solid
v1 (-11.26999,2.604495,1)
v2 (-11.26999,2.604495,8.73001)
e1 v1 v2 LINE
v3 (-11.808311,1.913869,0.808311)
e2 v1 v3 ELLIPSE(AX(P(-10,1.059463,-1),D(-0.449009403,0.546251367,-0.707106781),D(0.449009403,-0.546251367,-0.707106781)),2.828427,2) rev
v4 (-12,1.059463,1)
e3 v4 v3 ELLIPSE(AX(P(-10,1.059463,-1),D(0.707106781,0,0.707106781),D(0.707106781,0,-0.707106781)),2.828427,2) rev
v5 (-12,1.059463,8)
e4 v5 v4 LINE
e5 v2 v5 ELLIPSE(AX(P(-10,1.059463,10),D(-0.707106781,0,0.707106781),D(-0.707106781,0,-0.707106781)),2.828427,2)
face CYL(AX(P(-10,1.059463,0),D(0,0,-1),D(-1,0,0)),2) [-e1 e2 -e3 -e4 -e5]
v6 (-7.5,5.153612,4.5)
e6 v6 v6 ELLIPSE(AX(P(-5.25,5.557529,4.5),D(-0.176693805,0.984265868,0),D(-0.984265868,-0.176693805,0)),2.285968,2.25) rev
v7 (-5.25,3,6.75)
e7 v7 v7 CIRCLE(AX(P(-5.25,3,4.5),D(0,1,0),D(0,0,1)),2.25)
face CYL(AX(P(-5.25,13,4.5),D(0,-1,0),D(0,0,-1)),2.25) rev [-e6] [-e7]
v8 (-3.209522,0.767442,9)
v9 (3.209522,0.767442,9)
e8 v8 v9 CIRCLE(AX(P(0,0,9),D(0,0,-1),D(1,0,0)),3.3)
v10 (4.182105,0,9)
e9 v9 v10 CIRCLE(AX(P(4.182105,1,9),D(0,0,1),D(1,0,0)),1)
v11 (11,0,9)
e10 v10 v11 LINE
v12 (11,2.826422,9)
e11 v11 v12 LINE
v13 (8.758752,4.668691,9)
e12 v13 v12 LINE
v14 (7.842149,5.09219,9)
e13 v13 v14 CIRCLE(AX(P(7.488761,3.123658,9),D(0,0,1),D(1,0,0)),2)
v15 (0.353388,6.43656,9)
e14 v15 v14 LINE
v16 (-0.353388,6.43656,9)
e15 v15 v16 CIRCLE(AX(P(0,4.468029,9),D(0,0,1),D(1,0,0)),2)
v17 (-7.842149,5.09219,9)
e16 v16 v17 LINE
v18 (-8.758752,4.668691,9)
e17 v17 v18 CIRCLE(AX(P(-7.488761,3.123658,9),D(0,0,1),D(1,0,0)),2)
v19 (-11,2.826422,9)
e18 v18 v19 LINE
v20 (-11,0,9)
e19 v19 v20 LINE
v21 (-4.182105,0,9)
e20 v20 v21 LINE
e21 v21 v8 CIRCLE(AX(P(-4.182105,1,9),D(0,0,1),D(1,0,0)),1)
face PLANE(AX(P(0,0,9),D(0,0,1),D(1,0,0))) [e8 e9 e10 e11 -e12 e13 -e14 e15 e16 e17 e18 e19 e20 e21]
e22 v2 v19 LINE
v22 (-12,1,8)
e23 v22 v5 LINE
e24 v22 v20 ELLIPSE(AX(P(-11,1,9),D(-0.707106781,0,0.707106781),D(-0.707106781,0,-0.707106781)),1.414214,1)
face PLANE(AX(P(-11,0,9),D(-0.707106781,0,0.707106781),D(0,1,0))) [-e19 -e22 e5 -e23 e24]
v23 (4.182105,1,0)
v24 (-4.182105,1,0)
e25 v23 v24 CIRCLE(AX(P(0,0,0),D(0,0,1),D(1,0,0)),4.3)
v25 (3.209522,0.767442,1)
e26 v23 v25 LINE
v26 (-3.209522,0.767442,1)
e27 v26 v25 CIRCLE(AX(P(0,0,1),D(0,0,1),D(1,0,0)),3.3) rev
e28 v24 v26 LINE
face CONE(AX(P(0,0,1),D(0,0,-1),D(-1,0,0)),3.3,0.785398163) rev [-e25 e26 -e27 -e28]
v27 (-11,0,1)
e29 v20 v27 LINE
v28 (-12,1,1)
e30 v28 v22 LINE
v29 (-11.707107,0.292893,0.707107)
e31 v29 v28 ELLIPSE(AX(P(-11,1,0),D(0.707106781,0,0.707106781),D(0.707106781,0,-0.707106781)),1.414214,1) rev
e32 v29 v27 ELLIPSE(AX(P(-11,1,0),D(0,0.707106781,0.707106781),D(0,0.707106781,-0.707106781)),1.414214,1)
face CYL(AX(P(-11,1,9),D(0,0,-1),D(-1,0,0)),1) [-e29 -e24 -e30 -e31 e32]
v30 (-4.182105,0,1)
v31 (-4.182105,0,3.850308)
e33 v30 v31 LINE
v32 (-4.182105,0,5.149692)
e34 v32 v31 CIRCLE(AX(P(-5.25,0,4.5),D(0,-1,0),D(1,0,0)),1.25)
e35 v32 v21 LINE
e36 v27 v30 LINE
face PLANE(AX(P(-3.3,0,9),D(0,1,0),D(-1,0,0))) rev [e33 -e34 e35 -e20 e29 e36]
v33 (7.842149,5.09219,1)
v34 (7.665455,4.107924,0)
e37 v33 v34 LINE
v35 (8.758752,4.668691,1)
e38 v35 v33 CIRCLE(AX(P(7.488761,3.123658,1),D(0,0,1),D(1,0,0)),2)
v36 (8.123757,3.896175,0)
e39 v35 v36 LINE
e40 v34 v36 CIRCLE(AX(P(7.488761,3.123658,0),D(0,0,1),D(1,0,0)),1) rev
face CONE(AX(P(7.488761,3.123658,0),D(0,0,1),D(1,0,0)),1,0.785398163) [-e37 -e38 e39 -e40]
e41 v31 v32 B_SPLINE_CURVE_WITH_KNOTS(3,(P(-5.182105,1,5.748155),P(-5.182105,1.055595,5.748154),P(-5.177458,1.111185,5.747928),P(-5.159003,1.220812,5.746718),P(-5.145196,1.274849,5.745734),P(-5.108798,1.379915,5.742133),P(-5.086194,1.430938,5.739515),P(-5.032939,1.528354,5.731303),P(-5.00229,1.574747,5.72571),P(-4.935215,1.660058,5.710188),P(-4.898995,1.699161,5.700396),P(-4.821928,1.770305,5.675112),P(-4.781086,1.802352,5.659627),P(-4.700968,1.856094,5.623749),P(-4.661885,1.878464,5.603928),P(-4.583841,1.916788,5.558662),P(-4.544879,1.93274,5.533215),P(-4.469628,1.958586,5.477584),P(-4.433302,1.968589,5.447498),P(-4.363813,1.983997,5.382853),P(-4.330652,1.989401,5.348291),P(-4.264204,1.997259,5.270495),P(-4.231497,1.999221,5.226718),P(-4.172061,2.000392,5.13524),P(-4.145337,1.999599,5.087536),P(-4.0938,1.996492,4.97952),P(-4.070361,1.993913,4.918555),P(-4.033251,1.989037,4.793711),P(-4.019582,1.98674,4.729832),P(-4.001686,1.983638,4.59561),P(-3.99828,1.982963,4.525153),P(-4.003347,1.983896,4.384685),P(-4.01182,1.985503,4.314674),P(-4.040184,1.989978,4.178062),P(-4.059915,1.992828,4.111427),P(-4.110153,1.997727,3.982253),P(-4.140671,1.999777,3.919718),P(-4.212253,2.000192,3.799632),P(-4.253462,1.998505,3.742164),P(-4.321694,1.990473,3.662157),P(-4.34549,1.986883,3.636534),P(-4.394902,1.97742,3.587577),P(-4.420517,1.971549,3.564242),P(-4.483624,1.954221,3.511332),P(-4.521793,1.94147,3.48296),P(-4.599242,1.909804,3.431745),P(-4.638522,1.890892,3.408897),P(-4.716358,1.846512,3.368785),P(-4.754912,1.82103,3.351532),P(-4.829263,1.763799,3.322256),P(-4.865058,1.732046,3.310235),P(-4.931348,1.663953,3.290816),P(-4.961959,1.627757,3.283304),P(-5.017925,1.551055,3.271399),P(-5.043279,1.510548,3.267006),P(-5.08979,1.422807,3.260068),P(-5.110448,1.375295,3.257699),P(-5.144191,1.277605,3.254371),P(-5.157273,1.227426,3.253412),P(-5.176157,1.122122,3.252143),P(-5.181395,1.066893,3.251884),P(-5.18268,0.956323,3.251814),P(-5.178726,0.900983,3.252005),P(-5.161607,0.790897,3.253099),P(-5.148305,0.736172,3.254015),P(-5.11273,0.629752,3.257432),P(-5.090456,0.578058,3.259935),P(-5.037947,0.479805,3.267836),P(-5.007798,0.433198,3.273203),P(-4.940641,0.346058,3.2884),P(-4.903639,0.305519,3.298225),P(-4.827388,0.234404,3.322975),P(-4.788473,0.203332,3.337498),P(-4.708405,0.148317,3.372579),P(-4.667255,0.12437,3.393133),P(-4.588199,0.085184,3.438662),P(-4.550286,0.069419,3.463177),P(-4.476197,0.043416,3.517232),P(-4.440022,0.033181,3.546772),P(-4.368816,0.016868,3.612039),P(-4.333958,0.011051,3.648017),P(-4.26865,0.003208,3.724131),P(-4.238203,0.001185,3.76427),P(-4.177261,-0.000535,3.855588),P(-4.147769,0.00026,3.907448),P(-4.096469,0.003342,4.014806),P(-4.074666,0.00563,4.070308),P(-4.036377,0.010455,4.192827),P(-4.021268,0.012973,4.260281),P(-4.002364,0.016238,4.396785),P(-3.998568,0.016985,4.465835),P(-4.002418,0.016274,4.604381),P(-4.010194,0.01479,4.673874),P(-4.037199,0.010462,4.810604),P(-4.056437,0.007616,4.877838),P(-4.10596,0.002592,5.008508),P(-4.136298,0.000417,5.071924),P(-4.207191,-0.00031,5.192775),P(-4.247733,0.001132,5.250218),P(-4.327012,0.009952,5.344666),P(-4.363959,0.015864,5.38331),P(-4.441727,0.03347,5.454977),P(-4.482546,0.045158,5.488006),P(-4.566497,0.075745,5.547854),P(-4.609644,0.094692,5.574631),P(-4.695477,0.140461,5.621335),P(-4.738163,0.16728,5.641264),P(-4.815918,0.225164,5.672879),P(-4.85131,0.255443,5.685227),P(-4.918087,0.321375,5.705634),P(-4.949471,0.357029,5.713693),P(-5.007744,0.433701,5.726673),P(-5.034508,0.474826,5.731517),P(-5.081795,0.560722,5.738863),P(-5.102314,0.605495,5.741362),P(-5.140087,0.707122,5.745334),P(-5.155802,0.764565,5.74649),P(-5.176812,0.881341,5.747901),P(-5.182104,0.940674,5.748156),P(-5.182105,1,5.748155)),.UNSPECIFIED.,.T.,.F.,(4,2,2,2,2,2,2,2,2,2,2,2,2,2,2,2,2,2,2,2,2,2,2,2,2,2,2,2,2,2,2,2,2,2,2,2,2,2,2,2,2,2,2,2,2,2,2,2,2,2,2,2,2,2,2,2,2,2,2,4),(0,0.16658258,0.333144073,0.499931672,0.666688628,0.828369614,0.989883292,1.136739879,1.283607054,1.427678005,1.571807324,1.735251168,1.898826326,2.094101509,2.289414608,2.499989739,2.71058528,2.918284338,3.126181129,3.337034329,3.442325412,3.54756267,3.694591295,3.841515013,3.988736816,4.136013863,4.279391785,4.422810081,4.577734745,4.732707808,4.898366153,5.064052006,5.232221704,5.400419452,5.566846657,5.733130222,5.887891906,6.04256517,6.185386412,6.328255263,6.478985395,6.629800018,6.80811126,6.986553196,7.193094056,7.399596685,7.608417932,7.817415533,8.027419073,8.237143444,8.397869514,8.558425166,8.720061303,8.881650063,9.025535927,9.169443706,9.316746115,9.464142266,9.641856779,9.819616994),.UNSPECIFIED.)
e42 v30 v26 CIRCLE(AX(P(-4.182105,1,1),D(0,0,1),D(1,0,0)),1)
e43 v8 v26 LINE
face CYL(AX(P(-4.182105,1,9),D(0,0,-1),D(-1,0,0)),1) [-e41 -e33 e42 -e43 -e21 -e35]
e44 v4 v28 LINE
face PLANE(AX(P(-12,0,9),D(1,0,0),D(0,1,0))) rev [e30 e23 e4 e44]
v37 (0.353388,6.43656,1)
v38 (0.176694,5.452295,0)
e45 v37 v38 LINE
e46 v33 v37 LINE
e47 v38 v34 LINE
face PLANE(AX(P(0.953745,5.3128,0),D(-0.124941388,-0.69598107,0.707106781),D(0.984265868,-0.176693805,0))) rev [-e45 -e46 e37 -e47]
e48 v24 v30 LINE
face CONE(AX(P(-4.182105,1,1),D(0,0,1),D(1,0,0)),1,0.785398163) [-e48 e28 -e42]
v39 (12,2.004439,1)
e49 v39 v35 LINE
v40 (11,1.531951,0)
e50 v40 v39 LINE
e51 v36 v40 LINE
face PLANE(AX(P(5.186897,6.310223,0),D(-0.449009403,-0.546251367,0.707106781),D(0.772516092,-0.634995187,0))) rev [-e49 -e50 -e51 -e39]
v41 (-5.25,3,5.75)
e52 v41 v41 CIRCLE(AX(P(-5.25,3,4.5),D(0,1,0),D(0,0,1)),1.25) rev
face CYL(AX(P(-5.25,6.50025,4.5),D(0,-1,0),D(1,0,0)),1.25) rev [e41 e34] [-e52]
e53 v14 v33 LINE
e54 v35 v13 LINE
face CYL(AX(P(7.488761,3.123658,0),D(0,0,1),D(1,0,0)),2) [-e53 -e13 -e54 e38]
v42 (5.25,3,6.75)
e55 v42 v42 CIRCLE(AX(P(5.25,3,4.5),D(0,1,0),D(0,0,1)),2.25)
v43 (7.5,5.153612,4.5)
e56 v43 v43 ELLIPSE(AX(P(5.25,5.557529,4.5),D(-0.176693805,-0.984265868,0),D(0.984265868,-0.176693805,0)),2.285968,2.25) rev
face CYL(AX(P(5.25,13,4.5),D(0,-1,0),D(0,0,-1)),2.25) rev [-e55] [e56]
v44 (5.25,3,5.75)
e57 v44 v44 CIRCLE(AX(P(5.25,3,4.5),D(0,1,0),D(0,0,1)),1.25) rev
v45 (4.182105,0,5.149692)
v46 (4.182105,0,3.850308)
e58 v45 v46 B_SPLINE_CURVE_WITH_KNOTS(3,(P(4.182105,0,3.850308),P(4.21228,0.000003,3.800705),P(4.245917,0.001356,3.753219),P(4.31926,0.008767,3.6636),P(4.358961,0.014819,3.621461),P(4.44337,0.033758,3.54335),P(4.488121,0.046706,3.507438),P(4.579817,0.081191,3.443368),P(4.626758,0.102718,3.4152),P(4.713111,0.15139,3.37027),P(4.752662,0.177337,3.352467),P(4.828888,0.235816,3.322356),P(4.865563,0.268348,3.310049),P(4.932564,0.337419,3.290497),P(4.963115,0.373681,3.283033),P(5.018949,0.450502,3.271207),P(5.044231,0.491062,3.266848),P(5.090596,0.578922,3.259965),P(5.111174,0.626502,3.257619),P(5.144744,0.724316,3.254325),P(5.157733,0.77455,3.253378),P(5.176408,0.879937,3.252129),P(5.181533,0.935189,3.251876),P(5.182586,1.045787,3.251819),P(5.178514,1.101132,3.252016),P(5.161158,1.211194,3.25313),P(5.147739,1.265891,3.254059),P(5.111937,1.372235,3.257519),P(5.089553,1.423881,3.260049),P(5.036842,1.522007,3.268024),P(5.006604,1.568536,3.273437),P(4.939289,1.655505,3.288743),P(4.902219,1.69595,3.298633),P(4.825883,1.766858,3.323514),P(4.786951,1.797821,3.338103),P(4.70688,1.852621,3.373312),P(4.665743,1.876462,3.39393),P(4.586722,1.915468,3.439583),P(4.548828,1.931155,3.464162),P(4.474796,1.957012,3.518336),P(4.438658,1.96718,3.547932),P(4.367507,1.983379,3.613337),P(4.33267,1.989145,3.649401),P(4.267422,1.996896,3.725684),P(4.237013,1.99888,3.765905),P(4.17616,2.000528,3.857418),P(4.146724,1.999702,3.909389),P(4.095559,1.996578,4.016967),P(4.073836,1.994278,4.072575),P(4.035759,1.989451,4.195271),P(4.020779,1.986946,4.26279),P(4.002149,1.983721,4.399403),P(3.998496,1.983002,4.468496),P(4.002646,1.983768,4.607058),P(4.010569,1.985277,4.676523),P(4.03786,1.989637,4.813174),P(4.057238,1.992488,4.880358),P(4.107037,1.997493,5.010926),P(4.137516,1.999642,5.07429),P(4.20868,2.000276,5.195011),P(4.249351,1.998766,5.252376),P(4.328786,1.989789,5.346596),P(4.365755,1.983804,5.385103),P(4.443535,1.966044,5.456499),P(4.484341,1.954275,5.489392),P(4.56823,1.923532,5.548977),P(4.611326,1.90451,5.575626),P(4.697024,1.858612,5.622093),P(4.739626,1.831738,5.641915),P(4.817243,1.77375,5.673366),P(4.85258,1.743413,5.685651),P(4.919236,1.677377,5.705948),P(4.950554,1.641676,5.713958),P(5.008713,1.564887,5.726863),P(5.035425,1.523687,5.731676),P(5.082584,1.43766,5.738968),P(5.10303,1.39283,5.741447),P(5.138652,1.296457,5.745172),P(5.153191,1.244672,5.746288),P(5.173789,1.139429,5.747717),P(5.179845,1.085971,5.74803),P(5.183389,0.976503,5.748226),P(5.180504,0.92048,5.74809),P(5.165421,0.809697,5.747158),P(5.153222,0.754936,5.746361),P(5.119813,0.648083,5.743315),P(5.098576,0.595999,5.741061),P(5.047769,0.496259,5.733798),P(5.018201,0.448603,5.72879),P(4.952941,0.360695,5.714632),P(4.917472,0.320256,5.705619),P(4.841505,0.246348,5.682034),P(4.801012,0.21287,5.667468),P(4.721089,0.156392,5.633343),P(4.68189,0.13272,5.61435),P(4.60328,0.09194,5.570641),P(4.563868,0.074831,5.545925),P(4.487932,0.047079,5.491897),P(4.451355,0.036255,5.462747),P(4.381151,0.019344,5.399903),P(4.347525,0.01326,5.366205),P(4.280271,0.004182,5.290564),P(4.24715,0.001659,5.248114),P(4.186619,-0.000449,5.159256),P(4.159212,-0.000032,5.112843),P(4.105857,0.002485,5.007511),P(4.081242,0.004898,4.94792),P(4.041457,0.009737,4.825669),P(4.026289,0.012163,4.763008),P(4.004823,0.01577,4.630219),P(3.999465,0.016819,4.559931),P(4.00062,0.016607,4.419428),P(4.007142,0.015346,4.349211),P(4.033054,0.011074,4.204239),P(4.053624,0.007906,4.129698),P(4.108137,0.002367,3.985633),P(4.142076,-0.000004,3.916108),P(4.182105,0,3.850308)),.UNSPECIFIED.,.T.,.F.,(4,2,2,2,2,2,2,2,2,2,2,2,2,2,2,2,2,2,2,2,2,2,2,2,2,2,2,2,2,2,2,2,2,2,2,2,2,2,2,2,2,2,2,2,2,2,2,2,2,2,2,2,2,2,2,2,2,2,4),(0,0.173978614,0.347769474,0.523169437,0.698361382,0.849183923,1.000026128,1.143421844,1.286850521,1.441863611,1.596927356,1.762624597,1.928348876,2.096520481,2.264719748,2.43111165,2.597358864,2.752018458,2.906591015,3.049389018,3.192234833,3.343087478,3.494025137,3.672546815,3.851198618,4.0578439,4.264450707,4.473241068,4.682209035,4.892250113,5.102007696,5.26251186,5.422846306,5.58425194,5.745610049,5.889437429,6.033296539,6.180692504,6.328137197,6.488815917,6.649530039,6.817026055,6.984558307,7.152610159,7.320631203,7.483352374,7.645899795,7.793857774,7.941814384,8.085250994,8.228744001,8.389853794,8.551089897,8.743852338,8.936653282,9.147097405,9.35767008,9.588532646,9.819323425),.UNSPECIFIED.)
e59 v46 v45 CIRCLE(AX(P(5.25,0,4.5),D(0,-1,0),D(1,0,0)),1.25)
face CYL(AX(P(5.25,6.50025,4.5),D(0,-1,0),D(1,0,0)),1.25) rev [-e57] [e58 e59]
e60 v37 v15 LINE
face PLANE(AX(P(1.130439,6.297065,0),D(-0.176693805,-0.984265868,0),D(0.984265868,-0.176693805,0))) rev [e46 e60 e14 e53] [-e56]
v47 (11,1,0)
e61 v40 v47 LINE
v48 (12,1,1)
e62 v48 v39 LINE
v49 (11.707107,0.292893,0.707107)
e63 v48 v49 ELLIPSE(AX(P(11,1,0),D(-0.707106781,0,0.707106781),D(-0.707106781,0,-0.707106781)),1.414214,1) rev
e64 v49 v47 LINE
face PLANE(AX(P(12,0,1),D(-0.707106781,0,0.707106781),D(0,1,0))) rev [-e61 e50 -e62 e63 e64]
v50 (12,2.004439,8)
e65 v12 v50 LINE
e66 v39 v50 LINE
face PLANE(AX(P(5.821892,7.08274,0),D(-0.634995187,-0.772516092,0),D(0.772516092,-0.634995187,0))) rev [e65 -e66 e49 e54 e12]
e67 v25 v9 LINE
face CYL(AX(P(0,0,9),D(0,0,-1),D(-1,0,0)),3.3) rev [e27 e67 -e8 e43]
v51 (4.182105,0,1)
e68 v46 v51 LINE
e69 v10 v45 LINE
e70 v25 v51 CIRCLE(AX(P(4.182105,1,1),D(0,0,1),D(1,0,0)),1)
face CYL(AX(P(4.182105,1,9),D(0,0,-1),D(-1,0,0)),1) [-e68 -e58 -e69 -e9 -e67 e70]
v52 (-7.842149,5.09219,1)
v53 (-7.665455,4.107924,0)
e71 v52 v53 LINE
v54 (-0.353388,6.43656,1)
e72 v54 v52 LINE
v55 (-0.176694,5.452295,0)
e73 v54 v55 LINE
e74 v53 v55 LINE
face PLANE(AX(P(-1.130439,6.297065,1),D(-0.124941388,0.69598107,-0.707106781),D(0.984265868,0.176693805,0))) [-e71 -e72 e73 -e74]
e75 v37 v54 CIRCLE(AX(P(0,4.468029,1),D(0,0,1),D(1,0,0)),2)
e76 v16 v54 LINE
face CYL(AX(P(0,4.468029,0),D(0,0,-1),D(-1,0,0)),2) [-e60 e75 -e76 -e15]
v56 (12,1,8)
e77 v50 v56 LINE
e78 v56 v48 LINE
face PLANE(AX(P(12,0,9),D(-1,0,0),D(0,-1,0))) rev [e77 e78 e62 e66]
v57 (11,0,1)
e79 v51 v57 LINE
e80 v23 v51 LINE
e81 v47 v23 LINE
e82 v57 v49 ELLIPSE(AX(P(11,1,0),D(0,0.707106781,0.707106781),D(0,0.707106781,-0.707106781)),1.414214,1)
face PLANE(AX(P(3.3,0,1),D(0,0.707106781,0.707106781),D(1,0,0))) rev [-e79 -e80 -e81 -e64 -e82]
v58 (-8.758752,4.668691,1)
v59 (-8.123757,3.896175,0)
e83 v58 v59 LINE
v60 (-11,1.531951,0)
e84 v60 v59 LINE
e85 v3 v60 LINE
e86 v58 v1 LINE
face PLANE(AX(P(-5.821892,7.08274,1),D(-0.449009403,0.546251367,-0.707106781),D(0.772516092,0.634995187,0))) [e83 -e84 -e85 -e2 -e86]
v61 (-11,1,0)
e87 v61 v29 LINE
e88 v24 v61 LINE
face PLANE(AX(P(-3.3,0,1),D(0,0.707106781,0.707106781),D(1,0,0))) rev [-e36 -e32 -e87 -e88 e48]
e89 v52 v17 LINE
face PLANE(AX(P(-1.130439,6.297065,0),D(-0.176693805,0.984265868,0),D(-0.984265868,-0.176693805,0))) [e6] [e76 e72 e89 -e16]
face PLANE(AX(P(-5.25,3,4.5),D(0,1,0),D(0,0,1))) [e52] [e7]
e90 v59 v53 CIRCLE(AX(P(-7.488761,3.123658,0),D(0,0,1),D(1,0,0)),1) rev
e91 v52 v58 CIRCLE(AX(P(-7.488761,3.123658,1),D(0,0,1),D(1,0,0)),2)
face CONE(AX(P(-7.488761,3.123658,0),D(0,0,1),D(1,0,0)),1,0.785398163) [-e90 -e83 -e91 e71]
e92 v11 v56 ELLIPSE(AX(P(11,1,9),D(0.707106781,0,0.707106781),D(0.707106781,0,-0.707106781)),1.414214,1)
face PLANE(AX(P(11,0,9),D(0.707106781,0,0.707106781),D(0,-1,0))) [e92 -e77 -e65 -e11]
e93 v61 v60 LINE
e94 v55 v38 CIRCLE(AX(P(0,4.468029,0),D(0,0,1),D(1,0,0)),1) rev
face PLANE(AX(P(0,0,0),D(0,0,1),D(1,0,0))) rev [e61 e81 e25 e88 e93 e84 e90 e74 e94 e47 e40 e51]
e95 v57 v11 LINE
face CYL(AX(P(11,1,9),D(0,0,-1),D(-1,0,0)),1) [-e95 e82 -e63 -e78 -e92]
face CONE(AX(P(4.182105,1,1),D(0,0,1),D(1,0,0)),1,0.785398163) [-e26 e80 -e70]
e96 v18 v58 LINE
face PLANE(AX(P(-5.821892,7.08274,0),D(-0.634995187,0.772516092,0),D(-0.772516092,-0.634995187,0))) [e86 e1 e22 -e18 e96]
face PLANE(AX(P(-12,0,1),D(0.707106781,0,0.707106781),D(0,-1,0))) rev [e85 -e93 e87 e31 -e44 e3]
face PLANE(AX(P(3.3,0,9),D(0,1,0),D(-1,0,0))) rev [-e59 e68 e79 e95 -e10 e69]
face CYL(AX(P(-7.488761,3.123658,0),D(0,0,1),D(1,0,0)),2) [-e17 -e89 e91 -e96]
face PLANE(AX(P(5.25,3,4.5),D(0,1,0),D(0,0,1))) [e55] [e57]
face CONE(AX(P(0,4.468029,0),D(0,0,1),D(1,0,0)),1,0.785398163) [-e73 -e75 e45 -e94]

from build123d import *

# Parameters (mm, degrees)
BOSS_EXTRUDE1_DEPTH     = 9
CUT_EXTRUDE1_DEPTH      = 17.347782724
CUT_EXTRUDE1_DEPTH_BACK = 17.347782724
CHAMFER1_SIZE           = 1
FILLET3_R               = 1
SKETCH4_R               = 1.25
CUT_EXTRUDE2_DEPTH      = 17.347782724
CUT_EXTRUDE3_START      = 3
SKETCH5_R               = 2.25
CUT_EXTRUDE3_DEPTH      = 10
FILLET2_R               = 2
CHAMFER2_SIZE           = 1


with BuildPart() as part:
    # Sketch1 → Boss-Extrude1 (new body)
    with BuildSketch(Plane.XY):
        with BuildLine():
            Line((-3.3, 0), (-12, 0))
            Line((-12, 0), (-12, 6.5))
            Line((-12, 6.5), (12, 6.5))
            Line((12, 6.5), (12, 0))
            Line((12, 0), (3.3, 0))
            ThreePointArc((3.3, 0), (0, 3.3), (-3.3, 0))
        make_face()
    extrude(amount=BOSS_EXTRUDE1_DEPTH)

    # Sketch2 → Cut-Extrude1 (cut, two sides: drawn at the far end of the back side and taken through both)
    with BuildSketch(Plane.XY.offset(9).offset(-CUT_EXTRUDE1_DEPTH_BACK)):
        Polygon((-8.355690819, 5), (0, 6.5), (-12, 6.5), (-12, 2.004439372), align=None)
        Polygon((12, 6.5), (0, 6.5), (8.355690819, 5), (12, 2.004439372), align=None)
    extrude(amount=CUT_EXTRUDE1_DEPTH + CUT_EXTRUDE1_DEPTH_BACK, mode=Mode.SUBTRACT)

    # Chamfer1
    chamfer1_edges = [part.edges().sort_by_distance(p)[0] for p in [
        (12, 1.002219686, 9),
        (-12, 1.002219686, 0),
        (-12, 1.002219686, 9),
        (12, 1.002219686, 0),
    ]]
    chamfer(chamfer1_edges, length=CHAMFER1_SIZE)

    # Fillet3
    fillet3_edges = [part.edges().sort_by_distance(p)[0] for p in [
        (12, 0, 4.5),
        (3.3, 0, 4.5),
        (-12, 0, 4.5),
        (-3.3, 0, 4.5),
    ]]
    fillet(fillet3_edges, radius=FILLET3_R)

    # Sketch4 → Cut-Extrude2 (cut, through all)
    with BuildSketch(Plane.XZ):
        with Locations(Location((-5.25, 4.5, 0), (0, 0, 31.315725107))):
            Circle(SKETCH4_R)
        with Locations((5.25, 4.5)):
            Circle(SKETCH4_R)
    extrude(amount=-CUT_EXTRUDE2_DEPTH, mode=Mode.SUBTRACT)

    # Sketch5 → Cut-Extrude3 (cut)
    with BuildSketch(Plane(origin=(0, 0, 0), x_dir=(1, 0, 0), z_dir=(0, 1, 0)).offset(CUT_EXTRUDE3_START)):
        with Locations(Location((-5.25, -4.5, 0), (0, 0, 180))):
            Circle(SKETCH5_R)
        with Locations((5.25, -4.5)):
            Circle(SKETCH5_R)
    extrude(amount=CUT_EXTRUDE3_DEPTH, mode=Mode.SUBTRACT)

    # Fillet2
    fillet2_edges = [part.edges().sort_by_distance(p)[0] for p in [
        (8.355690819, 5, 4.5),
        (-8.355690819, 5, 4.5),
        (0, 6.5, 4.5),
        (-12, 2.004439372, 4.5),
    ]]
    fillet(fillet2_edges, radius=FILLET2_R)

    # Chamfer2
    chamfer2_edges = [part.edges().sort_by_distance(p)[0] for p in [
        (7.591052367, 0, 0),
        (3.562652612, 0.214965561, 0),
        (0, 3.3, 0),
        (-3.562652612, 0.214965561, 0),
        (-7.591052367, 0, 0),
    ]]
    chamfer(chamfer2_edges, length=CHAMFER2_SIZE)
    # the kernel refuses this chamfer: 1 mm, written as the material it takes off along each edge
    with BuildSketch(Plane(origin=(8.758751871, 4.668690619, 0), x_dir=(-0.6347551060767181, -0.7722240167716554, -0.02749587661058638), z_dir=(0.7725160920418075, -0.6349951870183377, 0)), Plane(origin=(-12.986666492, 1.193416171, 0), x_dir=(0.6347551060767181, -0.7722240167716553, -0.02749587661058636), z_dir=(0.7725160920418074, 0.6349951870183378, 0))) as chamfer2_2_piece_1:
        with BuildLine():
            Line((1.028673195, 0), (-0.056547155, -1.027117794))
            Line((-0.056547155, -1.027117794), (-0.076539593, -1.026567876))
            ThreePointArc((-0.076539593, -1.026567876), (-0.034129227, -0.51339783), (-0.019992438, 0.000549918))
            Line((-0.019992438, 0.000549918), (0.000549918, 0.019992438))
            ThreePointArc((0.000549918, 0.019992438), (0.514497665, 0.00585565), (1.029223113, 0.019992438))
            Line((1.029223113, 0.019992438), (1.028673195, 0))
        make_face()
    extrude(amount=5.472914628, mode=Mode.SUBTRACT)
    with BuildSketch(Plane(origin=(7.488761497, 3.123658435, 0), x_dir=(0.6349951870183373, 0.7725160920418078, 0), z_dir=(0.7725160920418078, -0.6349951870183373, 0))) as chamfer2_2_piece_2:
        with BuildLine():
            Line((0.971715729, -0.028284271), (2.028284271, 1.028284271))
            Line((2.028284271, 1.028284271), (2.048284271, 1.028284271))
            ThreePointArc((2.048284271, 1.028284271), (2.02, 0.514142136), (2.02, 0))
            Line((2.02, 0), (2, -0.02))
            ThreePointArc((2, -0.02), (1.485857864, -0.02), (0.971715729, -0.048284271))
            Line((0.971715729, -0.048284271), (0.971715729, -0.028284271))
        make_face()
    revolve(axis=Axis((7.488761497, 3.123658435, 0), (0, 0, 1)), revolution_arc=29.242385329, mode=Mode.SUBTRACT)
    with BuildSketch(Plane(origin=(0.35338761, 6.436560432, 0), x_dir=(-0.176626999834447, -0.9838937339463534, -0.02749587661058635), z_dir=(0.9842658682259174, -0.17669380477391067, 0)), Plane(origin=(-7.842149107, 5.092190171, 0), x_dir=(0.17662699983444718, -0.9838937339463534, -0.027495876610586334), z_dir=(0.9842658682259174, 0.17669380477391086, 0))) as chamfer2_2_piece_3:
        with BuildLine():
            Line((1.028673195, 0), (-0.056547155, -1.027117794))
            Line((-0.056547155, -1.027117794), (-0.076539593, -1.026567876))
            ThreePointArc((-0.076539593, -1.026567876), (-0.034129227, -0.51339783), (-0.019992438, 0.000549918))
            Line((-0.019992438, 0.000549918), (0.000549918, 0.019992438))
            ThreePointArc((0.000549918, 0.019992438), (0.514497665, 0.00585565), (1.029223113, 0.019992438))
            Line((1.029223113, 0.019992438), (1.028673195, 0))
        make_face()
    extrude(amount=7.608474234, mode=Mode.SUBTRACT)
    with BuildSketch(Plane(origin=(0, 4.468028696, 0), x_dir=(0.17669380477391125, 0.9842658682259174, 0), z_dir=(0.9842658682259174, -0.17669380477391125, 0))) as chamfer2_2_piece_4:
        with BuildLine():
            Line((0.971715729, -0.028284271), (2.028284271, 1.028284271))
            Line((2.028284271, 1.028284271), (2.048284271, 1.028284271))
            ThreePointArc((2.048284271, 1.028284271), (2.02, 0.514142136), (2.02, 0))
            Line((2.02, 0), (2, -0.02))
            ThreePointArc((2, -0.02), (1.485857864, -0.02), (0.971715729, -0.048284271))
            Line((0.971715729, -0.048284271), (0.971715729, -0.028284271))
        make_face()
    revolve(axis=Axis((0, 4.468028696, 0), (0, 0, 1)), revolution_arc=20.354484339, mode=Mode.SUBTRACT)
    with BuildSketch(Plane(origin=(-7.488761497, 3.123658435, 0), x_dir=(-0.17669380477391083, 0.9842658682259176, 0), z_dir=(0.9842658682259176, 0.17669380477391083, 0))) as chamfer2_2_piece_5:
        with BuildLine():
            Line((0.971715729, -0.028284271), (2.028284271, 1.028284271))
            Line((2.028284271, 1.028284271), (2.048284271, 1.028284271))
            ThreePointArc((2.048284271, 1.028284271), (2.02, 0.514142136), (2.02, 0))
            Line((2.02, 0), (2, -0.02))
            ThreePointArc((2, -0.02), (1.485857864, -0.02), (0.971715729, -0.048284271))
            Line((0.971715729, -0.048284271), (0.971715729, -0.028284271))
        make_face()
    revolve(axis=Axis((-7.488761497, 3.123658435, 0), (0, 0, 1)), revolution_arc=29.242385329, mode=Mode.SUBTRACT)


solid = part.part
